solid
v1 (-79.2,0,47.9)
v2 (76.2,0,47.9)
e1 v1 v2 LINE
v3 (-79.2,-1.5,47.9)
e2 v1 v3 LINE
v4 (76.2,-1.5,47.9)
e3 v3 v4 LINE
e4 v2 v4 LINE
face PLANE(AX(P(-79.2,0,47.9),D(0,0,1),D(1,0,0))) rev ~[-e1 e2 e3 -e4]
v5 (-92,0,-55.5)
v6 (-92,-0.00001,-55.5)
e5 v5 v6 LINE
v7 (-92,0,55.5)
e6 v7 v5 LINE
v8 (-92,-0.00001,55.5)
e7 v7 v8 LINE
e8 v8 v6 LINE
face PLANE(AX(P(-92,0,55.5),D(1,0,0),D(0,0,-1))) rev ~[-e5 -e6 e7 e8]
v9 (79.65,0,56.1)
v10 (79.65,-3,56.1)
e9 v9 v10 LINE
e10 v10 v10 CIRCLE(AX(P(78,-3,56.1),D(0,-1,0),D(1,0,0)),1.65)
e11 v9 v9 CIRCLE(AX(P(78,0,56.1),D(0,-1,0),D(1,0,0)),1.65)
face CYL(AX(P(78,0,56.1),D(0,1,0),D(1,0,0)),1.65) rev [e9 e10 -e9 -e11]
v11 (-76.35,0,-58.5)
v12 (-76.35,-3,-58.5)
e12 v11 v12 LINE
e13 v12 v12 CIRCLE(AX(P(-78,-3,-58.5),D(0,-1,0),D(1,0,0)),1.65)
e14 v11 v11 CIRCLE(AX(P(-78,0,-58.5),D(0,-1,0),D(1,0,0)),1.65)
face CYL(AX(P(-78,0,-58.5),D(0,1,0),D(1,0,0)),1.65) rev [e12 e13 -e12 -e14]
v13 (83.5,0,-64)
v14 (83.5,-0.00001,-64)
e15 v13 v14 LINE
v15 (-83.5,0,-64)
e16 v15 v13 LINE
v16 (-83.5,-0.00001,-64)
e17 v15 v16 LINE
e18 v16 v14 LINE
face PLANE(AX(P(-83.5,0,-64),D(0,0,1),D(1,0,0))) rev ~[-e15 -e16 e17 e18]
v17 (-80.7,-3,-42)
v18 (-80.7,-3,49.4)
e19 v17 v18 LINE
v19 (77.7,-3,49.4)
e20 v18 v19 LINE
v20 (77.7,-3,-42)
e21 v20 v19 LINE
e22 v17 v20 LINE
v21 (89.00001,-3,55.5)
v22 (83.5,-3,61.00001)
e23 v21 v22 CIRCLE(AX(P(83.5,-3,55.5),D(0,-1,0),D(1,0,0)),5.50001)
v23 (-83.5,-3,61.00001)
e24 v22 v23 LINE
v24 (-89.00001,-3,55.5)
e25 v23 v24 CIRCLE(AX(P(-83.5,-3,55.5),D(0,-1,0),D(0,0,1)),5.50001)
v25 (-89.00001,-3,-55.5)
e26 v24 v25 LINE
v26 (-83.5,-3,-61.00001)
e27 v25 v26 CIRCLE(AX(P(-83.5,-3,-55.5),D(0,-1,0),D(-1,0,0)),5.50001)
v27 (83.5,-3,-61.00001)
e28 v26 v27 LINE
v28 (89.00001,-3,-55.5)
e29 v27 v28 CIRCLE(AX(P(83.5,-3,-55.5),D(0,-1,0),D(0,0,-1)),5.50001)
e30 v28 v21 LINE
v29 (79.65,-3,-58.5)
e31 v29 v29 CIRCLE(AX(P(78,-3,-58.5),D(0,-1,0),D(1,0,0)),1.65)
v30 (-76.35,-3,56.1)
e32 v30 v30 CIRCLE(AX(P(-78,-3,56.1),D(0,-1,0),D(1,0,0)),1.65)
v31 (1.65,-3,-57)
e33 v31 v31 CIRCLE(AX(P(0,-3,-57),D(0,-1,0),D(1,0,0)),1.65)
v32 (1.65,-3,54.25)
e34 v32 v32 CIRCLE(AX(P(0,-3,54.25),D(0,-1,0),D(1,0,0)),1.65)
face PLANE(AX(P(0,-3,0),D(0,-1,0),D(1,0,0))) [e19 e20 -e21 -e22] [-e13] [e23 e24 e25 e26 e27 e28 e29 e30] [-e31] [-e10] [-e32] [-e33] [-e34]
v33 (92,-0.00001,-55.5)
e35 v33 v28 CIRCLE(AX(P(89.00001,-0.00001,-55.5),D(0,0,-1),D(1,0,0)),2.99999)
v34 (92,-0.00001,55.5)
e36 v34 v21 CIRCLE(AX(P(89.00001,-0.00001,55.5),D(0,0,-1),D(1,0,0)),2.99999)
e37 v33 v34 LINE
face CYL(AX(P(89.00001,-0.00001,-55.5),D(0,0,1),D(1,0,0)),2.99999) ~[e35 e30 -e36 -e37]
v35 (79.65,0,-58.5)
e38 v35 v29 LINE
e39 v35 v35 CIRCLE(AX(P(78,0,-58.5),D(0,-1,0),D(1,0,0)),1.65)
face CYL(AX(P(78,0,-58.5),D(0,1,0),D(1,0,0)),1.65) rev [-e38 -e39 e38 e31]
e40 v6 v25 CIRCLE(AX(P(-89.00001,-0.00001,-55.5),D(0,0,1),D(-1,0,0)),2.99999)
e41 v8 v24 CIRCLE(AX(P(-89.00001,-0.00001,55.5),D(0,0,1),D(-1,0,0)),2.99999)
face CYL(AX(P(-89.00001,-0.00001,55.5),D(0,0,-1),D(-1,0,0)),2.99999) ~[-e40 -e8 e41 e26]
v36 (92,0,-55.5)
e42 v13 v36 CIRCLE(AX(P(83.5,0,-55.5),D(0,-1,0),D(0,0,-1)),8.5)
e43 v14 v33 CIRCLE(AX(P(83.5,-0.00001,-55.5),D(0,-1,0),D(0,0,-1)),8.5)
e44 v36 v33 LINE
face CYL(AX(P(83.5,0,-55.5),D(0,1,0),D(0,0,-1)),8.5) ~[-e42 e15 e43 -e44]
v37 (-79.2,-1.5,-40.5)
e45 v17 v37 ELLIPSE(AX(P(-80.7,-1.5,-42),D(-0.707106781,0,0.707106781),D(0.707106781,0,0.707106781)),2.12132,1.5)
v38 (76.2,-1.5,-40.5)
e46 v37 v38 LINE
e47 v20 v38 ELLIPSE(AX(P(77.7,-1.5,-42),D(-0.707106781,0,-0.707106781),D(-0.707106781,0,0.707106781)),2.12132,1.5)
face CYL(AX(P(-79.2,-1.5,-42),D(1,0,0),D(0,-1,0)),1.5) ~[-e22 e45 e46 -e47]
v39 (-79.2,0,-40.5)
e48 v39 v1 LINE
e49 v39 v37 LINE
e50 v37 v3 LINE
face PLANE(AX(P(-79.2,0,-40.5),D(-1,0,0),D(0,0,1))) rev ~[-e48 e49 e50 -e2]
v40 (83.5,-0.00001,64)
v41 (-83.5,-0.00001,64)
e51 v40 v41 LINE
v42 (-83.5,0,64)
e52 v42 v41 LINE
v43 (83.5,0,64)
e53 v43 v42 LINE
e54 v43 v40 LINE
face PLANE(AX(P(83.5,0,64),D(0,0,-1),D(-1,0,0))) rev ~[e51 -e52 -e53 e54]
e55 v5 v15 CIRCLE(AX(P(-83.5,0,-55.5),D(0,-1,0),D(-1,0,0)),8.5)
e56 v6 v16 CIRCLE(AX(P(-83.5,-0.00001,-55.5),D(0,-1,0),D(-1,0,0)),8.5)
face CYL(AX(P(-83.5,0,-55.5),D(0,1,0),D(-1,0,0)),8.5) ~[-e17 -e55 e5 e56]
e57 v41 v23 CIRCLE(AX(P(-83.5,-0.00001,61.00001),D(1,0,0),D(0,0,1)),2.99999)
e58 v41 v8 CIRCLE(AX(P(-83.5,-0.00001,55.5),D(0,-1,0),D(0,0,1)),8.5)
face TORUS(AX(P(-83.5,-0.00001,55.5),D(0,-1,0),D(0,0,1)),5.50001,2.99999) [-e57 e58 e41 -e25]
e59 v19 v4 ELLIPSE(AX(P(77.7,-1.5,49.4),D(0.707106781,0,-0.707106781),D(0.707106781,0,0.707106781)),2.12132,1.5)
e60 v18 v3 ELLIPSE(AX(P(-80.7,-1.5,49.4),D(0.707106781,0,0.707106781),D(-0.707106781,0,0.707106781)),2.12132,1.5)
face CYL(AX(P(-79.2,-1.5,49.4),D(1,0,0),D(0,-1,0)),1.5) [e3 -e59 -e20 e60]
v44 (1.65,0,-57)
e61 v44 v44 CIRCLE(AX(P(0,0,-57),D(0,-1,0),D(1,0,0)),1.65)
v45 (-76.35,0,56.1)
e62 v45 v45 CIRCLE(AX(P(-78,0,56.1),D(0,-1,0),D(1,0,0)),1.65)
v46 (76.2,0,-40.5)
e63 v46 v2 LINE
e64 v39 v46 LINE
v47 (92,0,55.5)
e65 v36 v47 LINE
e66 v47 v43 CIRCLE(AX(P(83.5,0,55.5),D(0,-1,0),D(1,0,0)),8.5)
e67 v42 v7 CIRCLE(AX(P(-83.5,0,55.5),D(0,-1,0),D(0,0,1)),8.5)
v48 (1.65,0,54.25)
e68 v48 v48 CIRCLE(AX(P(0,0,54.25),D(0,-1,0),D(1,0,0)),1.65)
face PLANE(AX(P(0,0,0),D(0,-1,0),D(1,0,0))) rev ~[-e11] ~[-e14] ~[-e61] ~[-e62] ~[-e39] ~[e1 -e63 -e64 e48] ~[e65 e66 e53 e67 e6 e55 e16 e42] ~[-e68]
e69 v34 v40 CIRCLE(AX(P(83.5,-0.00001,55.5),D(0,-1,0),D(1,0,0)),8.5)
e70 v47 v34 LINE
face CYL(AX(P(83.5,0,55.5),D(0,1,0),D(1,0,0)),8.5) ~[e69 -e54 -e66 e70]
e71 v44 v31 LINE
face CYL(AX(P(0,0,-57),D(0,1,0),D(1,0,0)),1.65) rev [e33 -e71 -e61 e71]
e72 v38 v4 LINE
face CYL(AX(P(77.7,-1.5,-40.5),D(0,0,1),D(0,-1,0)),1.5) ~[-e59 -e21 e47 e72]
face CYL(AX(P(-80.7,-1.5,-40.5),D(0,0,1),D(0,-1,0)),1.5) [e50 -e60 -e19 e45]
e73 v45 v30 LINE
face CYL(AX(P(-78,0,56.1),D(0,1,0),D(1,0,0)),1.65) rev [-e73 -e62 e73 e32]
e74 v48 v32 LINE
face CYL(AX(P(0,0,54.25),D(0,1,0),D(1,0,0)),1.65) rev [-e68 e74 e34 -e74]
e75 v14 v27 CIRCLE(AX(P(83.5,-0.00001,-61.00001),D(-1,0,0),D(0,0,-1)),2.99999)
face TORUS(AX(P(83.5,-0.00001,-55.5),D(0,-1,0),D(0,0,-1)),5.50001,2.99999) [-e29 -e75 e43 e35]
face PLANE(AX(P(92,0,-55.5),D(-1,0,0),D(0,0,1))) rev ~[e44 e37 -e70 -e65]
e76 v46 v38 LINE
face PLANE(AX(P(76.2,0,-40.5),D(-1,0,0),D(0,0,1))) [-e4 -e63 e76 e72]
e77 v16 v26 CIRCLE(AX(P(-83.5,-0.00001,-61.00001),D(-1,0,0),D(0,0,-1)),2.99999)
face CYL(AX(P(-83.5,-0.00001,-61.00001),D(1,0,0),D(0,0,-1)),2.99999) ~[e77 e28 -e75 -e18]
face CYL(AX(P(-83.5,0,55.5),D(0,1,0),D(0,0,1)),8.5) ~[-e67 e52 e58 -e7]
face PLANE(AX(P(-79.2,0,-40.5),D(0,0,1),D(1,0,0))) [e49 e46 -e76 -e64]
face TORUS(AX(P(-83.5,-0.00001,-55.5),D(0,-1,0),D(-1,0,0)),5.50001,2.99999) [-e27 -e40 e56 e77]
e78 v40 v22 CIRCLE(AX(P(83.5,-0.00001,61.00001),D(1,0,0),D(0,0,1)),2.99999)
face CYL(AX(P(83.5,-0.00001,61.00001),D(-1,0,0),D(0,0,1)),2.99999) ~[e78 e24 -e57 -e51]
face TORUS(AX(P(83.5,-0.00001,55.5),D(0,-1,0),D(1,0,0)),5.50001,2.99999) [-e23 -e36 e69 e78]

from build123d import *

# Parameters (mm, degrees)
F0_R     = 1.65
F0_W     = 155.4
F0_H     = 88.4
F1_DEPTH = 3
F2_R     = 2.99999
F3_R     = 1.5


# Not quite as in the source:
# - a fillet or chamfer is up to 0.001 mm smaller than in the source, because OpenCascade refuses the exact size


with BuildPart() as f1:
    # F0 (on Front) → F1 (new body)
    with BuildSketch(Plane.XZ):
        with BuildLine():
            Line((83.5, 64), (-83.5, 64))
            ThreePointArc((-83.5, 64), (-89.5104076401, 61.5104076401), (-92, 55.5))
            Line((-92, 55.5), (-92, -55.5))
            ThreePointArc((-92, -55.5), (-89.5104076401, -61.5104076401), (-83.5, -64))
            Line((-83.5, -64), (83.5, -64))
            ThreePointArc((83.5, -64), (89.5104076401, -61.5104076401), (92, -55.5))
            Line((92, -55.5), (92, 55.5))
            ThreePointArc((92, 55.5), (89.5104076401, 61.5104076401), (83.5, 64))
        make_face()
        with Locations((-78, -58.5)):
            Circle(F0_R, mode=Mode.SUBTRACT)
        with Locations((0, -57)):
            Circle(F0_R, mode=Mode.SUBTRACT)
        with Locations((78, -58.5)):
            Circle(F0_R, mode=Mode.SUBTRACT)
        with BuildLine():
            Line((-83.5, -50.5), (-83.5, 52.5))
            Line((-83.5, 52.5), (83.5, 52.5))
            Line((83.5, 52.5), (83.5, -51.5))
            ThreePointArc((83.5, -51.5), (83.2071067812, -52.2071067812), (82.5, -52.5))
            Line((82.5, -52.5), (47.5, -52.5))
            ThreePointArc((47.5, -52.5), (46.7928932188, -52.2071067812), (46.5, -51.5))
            ThreePointArc((46.5, -51.5), (46.2071067812, -50.7928932188), (45.5, -50.5))
            Line((45.5, -50.5), (-83.5, -50.5))
        make_face(mode=Mode.SUBTRACT)
        with Locations((-78, 56.1)):
            Circle(F0_R, mode=Mode.SUBTRACT)
        with Locations((0, 54.25)):
            Circle(F0_R, mode=Mode.SUBTRACT)
        with Locations((78, 56.1)):
            Circle(F0_R, mode=Mode.SUBTRACT)
        with BuildLine():
            Line((83.5, 52.5), (-83.5, 52.5))
            Line((-83.5, 52.5), (-83.5, -50.5))
            Line((-83.5, -50.5), (45.5, -50.5))
            ThreePointArc((45.5, -50.5), (46.2071067812, -50.7928932188), (46.5, -51.5))
            ThreePointArc((46.5, -51.5), (46.7928932188, -52.2071067812), (47.5, -52.5))
            Line((47.5, -52.5), (82.5, -52.5))
            ThreePointArc((82.5, -52.5), (83.2071067812, -52.2071067812), (83.5, -51.5))
            Line((83.5, -51.5), (83.5, 52.5))
        make_face()
        with Locations((-1.5, 3.7)):
            Rectangle(F0_W, F0_H, mode=Mode.SUBTRACT)
    extrude(amount=F1_DEPTH)

    # F2 (radius 3 in the source; OpenCascade refuses exactly that, so slightly less here)
    f2_edges = [f1.edges().sort_by_distance(p)[0] for p in [
        (92, -3, 0),
    ]]
    fillet(f2_edges, radius=F2_R)

    # F3
    f3_edges = [f1.edges().sort_by_distance(p)[0] for p in [
        (-79.2, -3, 3.7),
        (-1.5, -3, 47.9),
        (76.2, -3, 3.7),
        (-1.5, -3, -40.5),
    ]]
    fillet(f3_edges, radius=F3_R)


solid = f1.part
